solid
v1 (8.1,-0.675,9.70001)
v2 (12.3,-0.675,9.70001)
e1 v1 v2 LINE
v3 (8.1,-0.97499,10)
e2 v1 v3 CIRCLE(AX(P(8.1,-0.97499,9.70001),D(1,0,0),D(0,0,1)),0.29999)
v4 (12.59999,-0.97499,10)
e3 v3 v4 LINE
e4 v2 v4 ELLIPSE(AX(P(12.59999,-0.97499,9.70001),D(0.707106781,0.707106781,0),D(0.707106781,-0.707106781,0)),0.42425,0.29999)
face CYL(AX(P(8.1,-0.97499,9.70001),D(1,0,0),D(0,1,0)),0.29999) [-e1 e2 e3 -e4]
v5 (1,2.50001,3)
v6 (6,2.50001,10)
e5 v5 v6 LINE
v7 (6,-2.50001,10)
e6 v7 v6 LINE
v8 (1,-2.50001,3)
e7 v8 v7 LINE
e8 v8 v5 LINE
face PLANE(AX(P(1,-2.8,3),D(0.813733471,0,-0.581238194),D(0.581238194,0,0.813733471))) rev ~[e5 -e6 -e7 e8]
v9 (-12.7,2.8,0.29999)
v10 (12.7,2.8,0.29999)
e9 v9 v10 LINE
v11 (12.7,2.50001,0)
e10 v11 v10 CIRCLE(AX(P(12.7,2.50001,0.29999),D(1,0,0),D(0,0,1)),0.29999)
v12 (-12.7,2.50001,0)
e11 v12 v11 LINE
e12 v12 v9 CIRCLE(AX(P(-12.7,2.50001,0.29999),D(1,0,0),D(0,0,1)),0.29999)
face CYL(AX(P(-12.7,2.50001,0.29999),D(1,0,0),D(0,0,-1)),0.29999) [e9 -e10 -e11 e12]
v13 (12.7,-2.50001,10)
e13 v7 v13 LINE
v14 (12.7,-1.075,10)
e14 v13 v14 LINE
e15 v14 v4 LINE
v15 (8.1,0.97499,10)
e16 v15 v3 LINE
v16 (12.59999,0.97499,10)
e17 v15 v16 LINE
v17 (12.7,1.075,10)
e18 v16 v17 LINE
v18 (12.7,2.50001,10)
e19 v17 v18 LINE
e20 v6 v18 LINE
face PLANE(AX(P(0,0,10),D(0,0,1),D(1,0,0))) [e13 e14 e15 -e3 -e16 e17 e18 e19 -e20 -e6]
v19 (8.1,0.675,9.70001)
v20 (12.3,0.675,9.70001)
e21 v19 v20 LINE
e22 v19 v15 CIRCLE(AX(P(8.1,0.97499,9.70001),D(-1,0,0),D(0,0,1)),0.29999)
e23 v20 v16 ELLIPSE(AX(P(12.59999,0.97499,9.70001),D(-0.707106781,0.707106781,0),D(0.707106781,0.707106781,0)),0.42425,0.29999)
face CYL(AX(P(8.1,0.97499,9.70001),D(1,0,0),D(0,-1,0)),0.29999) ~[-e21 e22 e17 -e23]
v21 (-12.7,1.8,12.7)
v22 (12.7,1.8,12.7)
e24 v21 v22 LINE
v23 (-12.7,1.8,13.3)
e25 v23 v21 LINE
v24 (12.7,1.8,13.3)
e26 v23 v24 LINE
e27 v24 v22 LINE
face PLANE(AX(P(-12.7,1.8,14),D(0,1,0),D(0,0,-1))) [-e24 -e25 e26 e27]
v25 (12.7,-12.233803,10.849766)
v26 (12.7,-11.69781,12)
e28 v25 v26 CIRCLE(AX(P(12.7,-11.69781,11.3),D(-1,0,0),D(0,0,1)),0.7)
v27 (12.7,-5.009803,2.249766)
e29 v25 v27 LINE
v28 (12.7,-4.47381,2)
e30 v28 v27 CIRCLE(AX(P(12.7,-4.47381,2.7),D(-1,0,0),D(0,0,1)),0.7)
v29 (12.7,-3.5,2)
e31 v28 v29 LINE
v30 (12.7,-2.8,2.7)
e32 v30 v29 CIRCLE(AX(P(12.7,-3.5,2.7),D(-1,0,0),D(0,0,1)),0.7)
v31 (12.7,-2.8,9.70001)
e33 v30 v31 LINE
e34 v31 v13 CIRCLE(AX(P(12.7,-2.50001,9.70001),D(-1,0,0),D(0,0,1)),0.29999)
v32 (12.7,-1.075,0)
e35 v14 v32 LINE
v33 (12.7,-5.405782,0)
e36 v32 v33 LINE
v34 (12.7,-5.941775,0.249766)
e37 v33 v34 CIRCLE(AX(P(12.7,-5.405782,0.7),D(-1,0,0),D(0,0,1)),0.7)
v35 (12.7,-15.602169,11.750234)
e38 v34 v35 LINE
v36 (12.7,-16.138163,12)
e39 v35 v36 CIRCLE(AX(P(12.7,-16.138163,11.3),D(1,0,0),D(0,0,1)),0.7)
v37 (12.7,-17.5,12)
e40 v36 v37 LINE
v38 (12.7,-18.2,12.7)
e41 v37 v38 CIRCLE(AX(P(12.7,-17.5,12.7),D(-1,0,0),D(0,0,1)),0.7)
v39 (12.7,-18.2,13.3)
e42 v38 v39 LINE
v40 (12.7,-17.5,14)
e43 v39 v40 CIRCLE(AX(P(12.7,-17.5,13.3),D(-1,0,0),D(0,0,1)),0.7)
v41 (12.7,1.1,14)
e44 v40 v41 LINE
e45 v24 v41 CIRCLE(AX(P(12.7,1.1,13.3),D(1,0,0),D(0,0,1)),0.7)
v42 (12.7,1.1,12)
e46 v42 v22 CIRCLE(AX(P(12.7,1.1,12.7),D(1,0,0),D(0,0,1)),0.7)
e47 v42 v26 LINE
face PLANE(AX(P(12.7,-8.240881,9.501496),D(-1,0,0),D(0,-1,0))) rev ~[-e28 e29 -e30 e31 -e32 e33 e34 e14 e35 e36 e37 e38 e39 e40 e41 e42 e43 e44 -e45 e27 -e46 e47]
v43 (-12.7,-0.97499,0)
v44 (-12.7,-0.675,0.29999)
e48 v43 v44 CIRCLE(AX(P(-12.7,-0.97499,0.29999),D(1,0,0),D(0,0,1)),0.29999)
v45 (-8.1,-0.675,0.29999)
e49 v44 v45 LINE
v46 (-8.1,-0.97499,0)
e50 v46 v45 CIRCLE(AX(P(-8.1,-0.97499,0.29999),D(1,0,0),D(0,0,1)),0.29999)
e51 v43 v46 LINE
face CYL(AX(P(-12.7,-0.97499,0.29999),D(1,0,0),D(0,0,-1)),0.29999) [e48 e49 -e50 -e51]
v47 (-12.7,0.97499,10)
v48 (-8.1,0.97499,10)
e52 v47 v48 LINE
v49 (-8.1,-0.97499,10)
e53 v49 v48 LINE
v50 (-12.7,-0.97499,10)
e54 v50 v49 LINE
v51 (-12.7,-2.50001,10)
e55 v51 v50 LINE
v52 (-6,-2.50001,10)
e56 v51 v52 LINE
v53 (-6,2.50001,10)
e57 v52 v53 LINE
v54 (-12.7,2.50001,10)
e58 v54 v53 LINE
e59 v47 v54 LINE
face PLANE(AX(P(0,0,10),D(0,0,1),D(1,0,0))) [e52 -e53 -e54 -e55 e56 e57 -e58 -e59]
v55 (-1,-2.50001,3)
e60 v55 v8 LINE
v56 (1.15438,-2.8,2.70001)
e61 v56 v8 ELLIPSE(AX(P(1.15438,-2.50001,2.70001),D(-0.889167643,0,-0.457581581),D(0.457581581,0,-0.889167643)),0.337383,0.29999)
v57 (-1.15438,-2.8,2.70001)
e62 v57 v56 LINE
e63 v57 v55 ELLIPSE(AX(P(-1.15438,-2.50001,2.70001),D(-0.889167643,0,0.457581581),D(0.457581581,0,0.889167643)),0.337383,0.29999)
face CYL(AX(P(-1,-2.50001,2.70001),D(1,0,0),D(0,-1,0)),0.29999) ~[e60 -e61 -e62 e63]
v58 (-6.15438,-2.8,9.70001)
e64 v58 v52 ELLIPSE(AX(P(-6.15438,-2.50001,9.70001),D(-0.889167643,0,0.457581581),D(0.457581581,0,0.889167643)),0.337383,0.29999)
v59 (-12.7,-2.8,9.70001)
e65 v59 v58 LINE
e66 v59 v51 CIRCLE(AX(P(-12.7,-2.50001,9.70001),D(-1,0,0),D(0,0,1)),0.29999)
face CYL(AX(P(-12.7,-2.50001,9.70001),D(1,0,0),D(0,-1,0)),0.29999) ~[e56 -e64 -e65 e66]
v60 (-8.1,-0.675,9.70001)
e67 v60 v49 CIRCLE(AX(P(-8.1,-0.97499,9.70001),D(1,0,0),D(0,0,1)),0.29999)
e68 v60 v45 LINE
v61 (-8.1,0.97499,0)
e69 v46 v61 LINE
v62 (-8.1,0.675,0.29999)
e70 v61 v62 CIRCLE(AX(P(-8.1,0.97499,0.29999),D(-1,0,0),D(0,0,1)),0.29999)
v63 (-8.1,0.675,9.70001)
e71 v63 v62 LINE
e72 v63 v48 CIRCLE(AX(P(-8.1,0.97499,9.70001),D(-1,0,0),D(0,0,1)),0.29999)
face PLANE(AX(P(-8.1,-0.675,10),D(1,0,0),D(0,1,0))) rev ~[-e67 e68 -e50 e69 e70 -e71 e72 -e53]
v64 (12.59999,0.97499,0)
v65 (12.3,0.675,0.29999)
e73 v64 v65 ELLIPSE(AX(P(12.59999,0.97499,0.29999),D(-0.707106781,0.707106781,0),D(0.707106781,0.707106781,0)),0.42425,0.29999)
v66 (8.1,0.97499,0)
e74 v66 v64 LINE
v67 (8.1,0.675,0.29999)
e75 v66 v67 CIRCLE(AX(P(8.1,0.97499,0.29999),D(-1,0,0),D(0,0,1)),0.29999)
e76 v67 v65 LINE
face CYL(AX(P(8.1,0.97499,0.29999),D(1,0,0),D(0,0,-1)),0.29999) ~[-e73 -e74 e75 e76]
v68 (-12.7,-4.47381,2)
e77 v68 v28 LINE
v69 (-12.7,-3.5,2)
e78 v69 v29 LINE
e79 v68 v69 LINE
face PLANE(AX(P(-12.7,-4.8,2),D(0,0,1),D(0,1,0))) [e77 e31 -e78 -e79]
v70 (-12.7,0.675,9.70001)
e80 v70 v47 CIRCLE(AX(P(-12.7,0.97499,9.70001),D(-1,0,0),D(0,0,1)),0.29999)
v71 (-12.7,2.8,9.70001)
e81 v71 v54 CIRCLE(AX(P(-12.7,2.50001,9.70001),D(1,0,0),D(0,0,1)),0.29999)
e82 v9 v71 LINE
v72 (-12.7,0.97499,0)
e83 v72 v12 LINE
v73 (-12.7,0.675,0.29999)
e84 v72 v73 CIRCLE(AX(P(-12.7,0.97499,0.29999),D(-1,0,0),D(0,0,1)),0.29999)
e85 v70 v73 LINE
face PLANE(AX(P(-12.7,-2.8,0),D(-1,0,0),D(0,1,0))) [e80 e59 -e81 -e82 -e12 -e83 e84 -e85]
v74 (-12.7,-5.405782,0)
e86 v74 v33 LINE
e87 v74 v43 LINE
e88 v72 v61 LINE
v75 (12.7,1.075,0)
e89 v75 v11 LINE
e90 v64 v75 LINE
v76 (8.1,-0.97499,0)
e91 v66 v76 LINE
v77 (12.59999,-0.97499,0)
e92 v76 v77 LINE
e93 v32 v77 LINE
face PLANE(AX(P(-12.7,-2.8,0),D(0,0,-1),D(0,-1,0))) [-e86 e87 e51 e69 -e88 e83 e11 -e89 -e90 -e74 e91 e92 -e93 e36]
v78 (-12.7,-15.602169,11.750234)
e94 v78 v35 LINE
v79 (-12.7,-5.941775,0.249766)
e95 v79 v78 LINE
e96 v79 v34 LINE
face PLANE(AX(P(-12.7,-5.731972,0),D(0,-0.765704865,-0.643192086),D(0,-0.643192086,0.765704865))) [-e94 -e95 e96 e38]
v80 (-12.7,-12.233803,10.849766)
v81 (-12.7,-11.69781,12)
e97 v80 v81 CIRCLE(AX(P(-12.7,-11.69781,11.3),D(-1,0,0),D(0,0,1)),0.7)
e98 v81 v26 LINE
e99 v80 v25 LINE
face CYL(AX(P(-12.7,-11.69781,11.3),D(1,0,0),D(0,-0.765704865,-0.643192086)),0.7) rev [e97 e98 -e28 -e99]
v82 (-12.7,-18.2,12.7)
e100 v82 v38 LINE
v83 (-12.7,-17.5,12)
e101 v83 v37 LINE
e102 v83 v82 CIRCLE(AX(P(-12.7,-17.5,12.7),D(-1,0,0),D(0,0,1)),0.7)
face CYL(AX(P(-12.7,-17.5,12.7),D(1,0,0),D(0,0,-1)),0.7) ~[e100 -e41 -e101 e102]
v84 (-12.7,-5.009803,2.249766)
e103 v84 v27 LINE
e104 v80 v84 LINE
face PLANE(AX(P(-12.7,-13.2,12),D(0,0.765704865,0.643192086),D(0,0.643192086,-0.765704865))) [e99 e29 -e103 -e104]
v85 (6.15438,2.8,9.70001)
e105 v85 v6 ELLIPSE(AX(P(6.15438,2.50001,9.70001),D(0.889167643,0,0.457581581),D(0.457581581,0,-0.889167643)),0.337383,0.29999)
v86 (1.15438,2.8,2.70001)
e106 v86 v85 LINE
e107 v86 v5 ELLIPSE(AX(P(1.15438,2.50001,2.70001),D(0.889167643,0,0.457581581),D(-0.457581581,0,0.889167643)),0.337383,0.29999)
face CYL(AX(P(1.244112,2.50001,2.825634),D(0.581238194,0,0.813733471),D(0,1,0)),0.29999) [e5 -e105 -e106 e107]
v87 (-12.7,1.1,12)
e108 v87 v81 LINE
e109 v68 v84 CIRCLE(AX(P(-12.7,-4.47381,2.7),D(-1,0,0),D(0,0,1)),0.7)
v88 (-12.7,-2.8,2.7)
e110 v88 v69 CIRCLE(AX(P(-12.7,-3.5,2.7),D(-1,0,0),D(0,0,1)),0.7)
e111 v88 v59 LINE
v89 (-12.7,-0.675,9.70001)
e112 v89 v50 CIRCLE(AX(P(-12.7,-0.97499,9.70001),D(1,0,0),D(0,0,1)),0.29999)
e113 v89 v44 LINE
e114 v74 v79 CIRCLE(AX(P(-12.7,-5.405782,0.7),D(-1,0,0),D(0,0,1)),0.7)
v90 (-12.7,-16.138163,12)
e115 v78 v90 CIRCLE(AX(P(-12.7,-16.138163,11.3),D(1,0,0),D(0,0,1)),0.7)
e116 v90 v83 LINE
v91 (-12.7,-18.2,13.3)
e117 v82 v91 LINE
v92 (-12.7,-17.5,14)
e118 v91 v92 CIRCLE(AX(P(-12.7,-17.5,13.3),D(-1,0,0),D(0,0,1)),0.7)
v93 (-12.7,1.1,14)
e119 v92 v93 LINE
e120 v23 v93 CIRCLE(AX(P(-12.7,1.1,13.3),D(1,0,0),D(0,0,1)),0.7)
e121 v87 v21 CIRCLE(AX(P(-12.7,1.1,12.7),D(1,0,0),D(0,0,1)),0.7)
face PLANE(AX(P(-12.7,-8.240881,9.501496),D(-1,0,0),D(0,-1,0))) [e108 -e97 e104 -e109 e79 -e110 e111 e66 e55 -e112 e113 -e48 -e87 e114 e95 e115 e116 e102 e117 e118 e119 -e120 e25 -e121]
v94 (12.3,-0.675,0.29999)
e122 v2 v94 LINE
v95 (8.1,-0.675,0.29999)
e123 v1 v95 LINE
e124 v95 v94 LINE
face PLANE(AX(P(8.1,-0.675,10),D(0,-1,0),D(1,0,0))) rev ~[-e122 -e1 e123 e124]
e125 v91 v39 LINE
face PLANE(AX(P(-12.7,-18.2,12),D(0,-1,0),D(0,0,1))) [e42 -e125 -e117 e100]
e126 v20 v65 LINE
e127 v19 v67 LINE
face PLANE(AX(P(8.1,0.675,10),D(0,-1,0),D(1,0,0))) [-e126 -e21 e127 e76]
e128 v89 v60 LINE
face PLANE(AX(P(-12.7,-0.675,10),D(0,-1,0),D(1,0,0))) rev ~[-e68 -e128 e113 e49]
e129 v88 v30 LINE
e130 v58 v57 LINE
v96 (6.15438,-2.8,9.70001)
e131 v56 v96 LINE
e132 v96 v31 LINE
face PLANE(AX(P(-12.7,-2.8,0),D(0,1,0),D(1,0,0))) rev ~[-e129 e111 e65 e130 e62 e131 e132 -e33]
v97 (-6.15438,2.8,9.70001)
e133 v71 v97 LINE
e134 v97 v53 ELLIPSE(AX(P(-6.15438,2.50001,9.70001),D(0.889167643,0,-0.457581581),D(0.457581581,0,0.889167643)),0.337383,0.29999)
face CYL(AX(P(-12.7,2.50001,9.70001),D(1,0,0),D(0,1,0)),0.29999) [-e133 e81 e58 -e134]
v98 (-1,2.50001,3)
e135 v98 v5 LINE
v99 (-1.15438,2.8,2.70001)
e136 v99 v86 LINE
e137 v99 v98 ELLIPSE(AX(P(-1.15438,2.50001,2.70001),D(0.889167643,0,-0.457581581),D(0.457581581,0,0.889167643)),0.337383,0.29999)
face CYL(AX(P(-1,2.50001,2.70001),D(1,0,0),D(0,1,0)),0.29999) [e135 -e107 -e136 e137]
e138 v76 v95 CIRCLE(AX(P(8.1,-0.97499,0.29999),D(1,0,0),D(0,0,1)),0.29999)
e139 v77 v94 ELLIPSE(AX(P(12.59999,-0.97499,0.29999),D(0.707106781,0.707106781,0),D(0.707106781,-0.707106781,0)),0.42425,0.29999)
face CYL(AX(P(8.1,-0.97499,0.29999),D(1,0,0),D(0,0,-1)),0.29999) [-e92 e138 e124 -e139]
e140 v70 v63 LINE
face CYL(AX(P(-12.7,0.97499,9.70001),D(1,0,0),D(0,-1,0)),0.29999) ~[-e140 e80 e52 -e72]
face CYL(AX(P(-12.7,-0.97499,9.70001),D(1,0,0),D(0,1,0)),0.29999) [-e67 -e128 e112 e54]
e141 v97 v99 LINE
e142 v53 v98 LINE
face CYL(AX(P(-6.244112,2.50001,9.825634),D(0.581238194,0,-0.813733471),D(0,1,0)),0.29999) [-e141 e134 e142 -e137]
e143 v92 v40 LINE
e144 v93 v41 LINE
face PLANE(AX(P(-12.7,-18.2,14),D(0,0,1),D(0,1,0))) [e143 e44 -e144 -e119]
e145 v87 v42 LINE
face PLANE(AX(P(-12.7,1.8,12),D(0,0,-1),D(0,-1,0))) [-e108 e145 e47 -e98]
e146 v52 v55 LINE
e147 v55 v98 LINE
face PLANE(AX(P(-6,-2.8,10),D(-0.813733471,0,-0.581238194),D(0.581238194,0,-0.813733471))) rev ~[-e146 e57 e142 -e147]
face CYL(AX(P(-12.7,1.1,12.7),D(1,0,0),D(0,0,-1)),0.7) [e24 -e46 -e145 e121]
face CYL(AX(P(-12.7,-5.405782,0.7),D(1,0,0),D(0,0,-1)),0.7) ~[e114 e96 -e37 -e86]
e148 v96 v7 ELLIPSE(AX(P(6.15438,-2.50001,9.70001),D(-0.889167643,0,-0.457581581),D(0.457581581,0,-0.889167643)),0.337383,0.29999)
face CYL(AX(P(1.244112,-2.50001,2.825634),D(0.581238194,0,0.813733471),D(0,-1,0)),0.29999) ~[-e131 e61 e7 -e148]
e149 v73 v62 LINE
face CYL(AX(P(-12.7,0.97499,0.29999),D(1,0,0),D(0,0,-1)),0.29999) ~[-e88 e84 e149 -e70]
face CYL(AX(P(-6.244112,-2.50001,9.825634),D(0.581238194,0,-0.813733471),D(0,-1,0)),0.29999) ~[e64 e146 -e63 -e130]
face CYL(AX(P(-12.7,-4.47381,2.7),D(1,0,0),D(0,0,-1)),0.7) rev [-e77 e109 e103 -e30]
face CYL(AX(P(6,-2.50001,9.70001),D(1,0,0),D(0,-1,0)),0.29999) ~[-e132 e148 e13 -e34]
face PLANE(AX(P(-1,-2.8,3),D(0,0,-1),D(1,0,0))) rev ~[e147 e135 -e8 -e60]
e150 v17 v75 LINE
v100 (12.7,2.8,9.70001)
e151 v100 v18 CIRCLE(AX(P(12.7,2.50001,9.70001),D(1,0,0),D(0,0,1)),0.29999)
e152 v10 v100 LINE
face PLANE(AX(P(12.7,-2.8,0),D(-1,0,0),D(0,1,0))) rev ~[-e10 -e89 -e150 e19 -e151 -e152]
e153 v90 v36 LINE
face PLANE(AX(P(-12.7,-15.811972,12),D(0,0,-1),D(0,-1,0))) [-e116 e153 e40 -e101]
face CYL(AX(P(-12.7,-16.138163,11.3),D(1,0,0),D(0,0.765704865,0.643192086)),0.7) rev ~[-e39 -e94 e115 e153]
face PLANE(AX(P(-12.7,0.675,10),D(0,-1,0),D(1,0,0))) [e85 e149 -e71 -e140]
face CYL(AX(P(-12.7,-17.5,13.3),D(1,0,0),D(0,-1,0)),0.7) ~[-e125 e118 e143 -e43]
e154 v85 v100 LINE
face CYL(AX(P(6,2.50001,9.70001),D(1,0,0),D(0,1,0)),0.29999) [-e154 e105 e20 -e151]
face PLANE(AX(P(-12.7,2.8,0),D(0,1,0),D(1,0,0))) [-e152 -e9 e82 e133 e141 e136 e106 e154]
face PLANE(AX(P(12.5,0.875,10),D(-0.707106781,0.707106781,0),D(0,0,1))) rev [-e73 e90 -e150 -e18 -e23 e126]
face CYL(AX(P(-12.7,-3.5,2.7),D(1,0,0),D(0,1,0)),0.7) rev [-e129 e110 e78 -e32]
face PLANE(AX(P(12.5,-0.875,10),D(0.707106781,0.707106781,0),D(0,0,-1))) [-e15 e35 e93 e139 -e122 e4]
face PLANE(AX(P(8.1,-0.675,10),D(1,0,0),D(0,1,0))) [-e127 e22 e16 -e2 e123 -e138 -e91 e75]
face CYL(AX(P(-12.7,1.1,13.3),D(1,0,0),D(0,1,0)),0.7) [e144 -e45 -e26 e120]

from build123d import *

# Parameters (mm, degrees)
F0_W     = 25.4
F0_H     = 5.6
F1_DEPTH = 10
F2_W     = 4.6
F2_H     = 1.35
F3_DEPTH = 10
F5_DEPTH = 5.6
F7_DEPTH = 25.4
F8_SIZE  = 0.4
F9_R     = 0.7
F10_R    = 0.29999


# Not quite as in the source:
# - a fillet or chamfer is up to 0.001 mm smaller than in the source, because OpenCascade refuses the exact size


with BuildPart() as f1:
    # F0 (on Top) → F1 (new body)
    with BuildSketch(Plane.XY):
        Rectangle(F0_W, F0_H)
    extrude(amount=F1_DEPTH)

    # F2 (on face) → F3 (cut, through all)
    with BuildSketch(Plane.XY.offset(10)):
        with Locations((-10.4, 0)):
            Rectangle(F2_W, F2_H)
        with Locations((10.4, 0)):
            Rectangle(F2_W, F2_H)
    extrude(amount=-F3_DEPTH, mode=Mode.SUBTRACT)

    # F4 (on face) → F5 (cut, through all)
    with BuildSketch(Plane.XZ.offset(2.8)):
        Polygon((6, 10), (-6, 10), (-1, 3), (1, 3), align=None)
    extrude(amount=-F5_DEPTH, mode=Mode.SUBTRACT)

    # F6 (on face) → F7 (join, through all)
    with BuildSketch(Plane(origin=(-12.7, 0, 0), x_dir=(0, -1, 0), z_dir=(-1, 0, 0))):
        Polygon((2.8, 2), (2.8, 0), (5.7319724348, 0), (15.8119724348, 12), (18.2, 12), (18.2, 14), (-1.8, 14), (-1.8, 12), (13.2, 12), (4.8, 2), align=None)
    extrude(amount=-F7_DEPTH)

    # F8
    f8_edges = [f1.edges().sort_by_distance(p)[0] for p in [
        (12.7, 0.675, 5),
        (12.7, -0.675, 5),
    ]]
    chamfer(f8_edges, length=F8_SIZE)

    # F9
    f9_edges = [f1.edges().sort_by_distance(p)[0] for p in [
        (0, -2.8, 2),
        (0, -4.8, 2),
        (0, -13.2, 12),
        (0, -15.811972, 12),
        (0, -5.731972, 0),
        (0, -18.2, 12),
        (0, -18.2, 14),
        (0, 1.8, 12),
        (0, 1.8, 14),
    ]]
    fillet(f9_edges, radius=F9_R)

    # F10 (radius 0.3 in the source; OpenCascade refuses exactly that, so slightly less here)
    f10_edges = [f1.edges().sort_by_distance(p)[0] for p in [
        (0, 2.8, 0),
        (9.35, 2.8, 10),
        (-9.35, 2.8, 10),
        (-10.4, 0.675, 0),
        (10.2, 0.675, 0),
        (10.2, -0.675, 0),
        (-10.4, -0.675, 0),
        (10.2, 0.675, 10),
        (10.2, -0.675, 10),
        (9.35, -2.8, 10),
        (-10.4, 0.675, 10),
        (-10.4, -0.675, 10),
        (-9.35, -2.8, 10),
        (3.5, 2.8, 6.5),
        (0, 2.8, 3),
        (-3.5, 2.8, 6.5),
        (0, -2.8, 3),
        (3.5, -2.8, 6.5),
        (-3.5, -2.8, 6.5),
    ]]
    fillet(f10_edges, radius=F10_R)


solid = f1.part
